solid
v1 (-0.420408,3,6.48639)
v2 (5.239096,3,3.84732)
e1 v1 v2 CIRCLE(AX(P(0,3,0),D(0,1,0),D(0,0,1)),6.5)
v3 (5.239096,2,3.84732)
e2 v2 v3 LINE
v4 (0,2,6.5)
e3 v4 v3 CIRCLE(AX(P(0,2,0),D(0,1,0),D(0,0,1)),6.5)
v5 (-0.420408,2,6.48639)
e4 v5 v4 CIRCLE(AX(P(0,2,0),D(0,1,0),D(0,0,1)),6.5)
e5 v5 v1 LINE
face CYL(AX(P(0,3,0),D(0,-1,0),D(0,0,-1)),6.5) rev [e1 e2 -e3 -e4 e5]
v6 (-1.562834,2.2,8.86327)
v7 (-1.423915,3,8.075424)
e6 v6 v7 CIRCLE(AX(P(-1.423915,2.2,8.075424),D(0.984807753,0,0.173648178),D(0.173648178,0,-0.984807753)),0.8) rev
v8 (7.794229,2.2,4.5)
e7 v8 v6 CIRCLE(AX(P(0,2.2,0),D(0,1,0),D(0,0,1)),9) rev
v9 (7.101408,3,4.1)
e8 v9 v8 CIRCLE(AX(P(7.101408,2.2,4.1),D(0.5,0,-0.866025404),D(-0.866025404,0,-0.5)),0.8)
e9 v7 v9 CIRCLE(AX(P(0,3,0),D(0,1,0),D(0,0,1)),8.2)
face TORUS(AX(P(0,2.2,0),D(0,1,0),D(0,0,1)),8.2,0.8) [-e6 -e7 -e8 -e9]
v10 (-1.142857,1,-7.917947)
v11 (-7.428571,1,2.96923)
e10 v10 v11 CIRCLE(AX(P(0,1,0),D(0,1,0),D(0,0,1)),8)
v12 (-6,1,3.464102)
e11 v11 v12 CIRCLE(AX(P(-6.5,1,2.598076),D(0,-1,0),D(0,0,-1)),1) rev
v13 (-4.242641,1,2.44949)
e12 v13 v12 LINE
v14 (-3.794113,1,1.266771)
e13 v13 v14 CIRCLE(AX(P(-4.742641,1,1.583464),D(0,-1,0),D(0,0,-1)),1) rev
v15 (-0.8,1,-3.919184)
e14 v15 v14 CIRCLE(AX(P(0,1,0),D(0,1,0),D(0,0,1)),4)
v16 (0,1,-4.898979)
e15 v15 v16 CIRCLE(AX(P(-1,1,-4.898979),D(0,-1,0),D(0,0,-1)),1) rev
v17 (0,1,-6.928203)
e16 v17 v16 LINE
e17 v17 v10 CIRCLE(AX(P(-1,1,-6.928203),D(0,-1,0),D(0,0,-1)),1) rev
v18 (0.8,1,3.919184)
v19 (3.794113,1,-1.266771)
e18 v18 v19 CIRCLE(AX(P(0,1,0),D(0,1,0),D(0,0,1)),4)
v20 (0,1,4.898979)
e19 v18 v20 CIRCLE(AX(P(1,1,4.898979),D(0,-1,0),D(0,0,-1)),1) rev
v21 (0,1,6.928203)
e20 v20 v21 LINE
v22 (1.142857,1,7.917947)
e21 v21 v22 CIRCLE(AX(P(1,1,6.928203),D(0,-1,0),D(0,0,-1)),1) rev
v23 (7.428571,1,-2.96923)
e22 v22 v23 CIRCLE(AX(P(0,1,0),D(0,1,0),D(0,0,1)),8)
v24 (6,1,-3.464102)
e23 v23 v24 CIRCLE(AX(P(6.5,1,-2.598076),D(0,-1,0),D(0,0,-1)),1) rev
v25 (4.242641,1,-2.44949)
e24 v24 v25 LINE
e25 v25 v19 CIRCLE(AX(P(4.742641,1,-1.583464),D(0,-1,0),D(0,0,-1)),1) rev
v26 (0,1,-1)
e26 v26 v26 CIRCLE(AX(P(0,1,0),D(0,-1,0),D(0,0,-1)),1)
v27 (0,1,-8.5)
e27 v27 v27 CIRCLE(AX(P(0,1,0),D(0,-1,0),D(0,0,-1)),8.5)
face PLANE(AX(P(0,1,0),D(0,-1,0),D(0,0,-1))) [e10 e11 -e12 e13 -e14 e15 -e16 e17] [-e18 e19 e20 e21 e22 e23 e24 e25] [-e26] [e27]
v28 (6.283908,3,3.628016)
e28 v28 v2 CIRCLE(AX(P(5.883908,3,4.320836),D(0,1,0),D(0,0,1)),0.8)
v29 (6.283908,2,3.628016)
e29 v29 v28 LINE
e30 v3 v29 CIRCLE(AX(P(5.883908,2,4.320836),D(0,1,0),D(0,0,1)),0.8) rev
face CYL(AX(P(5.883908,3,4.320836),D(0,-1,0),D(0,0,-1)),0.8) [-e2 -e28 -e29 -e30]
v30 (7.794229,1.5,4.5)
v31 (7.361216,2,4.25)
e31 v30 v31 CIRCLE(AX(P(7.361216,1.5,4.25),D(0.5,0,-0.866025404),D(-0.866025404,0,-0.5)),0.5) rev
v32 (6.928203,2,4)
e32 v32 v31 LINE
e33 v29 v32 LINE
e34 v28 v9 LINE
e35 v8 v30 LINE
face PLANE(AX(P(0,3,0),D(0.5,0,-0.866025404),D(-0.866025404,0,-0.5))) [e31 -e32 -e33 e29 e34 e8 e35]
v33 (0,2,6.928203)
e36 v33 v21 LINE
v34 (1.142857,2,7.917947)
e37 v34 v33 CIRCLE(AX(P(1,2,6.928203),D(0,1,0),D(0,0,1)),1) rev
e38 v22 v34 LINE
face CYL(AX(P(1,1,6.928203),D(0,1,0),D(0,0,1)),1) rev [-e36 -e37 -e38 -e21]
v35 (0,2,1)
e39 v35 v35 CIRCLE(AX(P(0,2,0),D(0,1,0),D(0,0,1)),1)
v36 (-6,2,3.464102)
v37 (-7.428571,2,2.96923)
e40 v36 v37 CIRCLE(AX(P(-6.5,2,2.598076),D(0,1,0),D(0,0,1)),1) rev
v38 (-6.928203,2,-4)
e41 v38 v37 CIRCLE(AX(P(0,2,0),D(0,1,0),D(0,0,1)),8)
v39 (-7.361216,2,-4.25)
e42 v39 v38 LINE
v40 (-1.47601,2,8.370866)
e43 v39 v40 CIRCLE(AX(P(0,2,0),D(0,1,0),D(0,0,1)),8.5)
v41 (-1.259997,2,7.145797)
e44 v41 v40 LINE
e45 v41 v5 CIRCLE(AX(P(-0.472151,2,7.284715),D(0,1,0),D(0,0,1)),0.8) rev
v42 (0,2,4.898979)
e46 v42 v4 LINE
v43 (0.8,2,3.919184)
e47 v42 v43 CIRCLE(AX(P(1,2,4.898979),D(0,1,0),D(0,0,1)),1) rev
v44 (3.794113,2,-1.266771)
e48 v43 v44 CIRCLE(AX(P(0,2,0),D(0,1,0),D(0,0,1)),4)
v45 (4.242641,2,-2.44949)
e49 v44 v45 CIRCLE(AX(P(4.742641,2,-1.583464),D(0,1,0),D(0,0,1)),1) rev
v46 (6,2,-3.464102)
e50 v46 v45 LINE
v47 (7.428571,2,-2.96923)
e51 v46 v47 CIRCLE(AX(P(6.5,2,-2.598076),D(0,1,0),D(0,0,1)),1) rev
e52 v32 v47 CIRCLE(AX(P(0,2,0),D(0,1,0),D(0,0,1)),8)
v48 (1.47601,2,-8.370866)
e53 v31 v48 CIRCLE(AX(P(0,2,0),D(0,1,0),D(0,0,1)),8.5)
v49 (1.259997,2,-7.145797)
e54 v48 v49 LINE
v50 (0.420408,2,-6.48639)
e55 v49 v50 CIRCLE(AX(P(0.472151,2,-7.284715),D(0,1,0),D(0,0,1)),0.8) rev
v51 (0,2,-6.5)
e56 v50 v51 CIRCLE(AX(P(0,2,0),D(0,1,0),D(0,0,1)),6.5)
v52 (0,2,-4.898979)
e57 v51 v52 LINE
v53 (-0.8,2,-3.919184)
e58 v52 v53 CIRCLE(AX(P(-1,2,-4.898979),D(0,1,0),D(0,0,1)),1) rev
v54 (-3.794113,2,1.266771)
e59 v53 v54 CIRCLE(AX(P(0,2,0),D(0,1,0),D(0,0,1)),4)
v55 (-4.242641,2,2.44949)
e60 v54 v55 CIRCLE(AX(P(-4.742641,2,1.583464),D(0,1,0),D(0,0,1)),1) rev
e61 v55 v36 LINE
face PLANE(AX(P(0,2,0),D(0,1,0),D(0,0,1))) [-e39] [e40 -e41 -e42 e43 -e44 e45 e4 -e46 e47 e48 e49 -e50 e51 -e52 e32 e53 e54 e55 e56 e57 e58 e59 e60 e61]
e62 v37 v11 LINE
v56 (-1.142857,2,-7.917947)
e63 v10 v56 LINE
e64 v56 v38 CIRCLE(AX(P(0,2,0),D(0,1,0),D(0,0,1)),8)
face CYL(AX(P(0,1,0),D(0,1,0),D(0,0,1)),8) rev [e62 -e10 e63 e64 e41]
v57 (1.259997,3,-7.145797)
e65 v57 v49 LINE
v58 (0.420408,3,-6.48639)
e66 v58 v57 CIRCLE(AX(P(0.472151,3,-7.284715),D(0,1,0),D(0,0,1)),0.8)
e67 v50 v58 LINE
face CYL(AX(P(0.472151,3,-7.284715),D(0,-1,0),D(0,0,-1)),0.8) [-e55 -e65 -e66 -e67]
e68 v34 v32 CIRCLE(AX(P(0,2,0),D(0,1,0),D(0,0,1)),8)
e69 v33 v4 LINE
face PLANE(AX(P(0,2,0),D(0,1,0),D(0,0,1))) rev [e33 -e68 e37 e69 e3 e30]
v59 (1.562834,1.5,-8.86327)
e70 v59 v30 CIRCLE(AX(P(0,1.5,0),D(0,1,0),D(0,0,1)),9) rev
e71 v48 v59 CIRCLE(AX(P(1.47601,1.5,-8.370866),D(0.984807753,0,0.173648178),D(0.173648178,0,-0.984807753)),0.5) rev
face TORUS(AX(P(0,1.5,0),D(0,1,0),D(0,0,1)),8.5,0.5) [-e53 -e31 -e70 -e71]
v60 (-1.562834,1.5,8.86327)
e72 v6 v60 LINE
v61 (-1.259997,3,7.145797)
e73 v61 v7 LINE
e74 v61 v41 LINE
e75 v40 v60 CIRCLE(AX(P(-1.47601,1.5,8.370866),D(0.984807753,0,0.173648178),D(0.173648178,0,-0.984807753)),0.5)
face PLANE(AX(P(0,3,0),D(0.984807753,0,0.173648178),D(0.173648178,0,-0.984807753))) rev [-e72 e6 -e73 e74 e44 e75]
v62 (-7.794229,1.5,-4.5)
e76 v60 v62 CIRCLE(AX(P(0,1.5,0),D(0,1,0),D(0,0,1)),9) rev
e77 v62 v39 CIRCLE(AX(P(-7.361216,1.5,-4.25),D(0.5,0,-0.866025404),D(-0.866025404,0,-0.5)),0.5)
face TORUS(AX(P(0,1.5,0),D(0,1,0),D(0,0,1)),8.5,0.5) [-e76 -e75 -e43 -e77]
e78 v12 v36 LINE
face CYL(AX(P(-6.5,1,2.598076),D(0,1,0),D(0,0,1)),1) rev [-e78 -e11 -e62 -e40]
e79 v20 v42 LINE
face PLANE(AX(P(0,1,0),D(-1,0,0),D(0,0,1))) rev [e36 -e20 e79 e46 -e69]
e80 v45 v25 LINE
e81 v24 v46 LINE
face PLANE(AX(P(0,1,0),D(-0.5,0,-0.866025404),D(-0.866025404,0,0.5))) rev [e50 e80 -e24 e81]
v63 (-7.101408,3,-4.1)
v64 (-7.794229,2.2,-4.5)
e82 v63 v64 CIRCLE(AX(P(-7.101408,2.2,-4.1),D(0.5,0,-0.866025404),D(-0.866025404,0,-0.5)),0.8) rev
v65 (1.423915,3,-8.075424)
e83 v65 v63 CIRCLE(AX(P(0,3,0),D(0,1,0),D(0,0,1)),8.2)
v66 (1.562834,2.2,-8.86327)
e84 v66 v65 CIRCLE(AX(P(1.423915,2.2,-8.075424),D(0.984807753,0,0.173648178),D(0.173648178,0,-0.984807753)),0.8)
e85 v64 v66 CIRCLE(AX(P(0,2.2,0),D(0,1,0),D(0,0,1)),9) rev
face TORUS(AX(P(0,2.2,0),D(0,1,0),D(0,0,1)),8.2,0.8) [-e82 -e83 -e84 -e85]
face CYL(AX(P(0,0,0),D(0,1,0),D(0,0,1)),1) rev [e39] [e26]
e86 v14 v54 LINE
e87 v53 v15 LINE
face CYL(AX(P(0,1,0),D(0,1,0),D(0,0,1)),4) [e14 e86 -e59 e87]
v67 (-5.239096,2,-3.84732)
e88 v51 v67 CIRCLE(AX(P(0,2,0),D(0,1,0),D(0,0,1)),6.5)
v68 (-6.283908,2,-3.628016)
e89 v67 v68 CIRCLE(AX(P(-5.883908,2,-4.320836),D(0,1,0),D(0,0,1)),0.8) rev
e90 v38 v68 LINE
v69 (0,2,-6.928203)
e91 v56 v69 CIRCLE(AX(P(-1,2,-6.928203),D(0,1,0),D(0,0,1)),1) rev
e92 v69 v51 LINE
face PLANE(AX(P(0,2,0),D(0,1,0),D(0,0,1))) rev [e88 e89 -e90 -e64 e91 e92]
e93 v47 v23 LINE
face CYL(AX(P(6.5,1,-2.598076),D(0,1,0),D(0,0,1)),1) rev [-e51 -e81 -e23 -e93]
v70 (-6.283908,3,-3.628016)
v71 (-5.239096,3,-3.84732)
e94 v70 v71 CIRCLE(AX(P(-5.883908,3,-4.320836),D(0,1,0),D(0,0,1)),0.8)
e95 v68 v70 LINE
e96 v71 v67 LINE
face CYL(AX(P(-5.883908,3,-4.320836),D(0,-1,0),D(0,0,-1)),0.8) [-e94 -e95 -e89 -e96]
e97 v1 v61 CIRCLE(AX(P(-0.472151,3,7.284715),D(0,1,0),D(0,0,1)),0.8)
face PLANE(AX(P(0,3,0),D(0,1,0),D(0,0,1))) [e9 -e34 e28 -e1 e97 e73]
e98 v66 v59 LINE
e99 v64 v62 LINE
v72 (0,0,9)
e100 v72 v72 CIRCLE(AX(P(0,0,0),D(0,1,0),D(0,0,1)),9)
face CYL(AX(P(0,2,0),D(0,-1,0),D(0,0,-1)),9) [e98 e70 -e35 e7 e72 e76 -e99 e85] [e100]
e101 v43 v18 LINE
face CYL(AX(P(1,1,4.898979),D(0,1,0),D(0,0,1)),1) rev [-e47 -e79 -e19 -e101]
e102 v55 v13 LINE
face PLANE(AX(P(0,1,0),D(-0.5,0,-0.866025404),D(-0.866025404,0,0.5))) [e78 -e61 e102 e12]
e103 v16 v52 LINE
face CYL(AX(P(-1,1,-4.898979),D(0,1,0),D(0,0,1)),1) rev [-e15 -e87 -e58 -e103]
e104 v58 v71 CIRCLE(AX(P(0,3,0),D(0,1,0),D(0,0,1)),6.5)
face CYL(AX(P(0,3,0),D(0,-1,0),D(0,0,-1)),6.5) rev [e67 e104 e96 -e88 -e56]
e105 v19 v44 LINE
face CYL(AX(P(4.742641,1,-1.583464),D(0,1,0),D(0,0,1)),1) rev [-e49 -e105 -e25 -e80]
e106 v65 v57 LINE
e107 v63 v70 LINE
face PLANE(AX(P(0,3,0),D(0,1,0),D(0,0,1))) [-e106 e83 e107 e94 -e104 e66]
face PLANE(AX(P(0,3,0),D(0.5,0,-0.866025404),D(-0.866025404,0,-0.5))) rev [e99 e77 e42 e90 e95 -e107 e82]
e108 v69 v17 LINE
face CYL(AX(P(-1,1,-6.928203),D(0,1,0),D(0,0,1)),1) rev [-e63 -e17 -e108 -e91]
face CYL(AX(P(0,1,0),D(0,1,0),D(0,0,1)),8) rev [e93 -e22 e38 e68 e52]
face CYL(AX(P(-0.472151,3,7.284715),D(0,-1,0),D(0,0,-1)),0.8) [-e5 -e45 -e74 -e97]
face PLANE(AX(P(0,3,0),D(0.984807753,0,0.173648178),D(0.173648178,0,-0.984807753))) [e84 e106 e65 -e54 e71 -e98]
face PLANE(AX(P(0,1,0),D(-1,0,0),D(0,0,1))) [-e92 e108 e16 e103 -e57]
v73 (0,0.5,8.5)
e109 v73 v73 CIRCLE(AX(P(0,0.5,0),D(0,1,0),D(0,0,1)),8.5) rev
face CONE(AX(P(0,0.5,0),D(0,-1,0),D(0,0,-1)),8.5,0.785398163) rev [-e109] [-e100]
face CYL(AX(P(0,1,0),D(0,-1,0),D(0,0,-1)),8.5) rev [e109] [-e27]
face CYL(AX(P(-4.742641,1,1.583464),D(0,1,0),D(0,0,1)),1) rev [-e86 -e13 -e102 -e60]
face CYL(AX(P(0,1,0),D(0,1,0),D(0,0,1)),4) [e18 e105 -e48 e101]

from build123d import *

# Parameters (mm, degrees)
SKETCH_1_R          = 9
EXTRUDE_1_DEPTH     = 2
SKETCH_2_R          = 8.5
CUT_EXTRUDE_1_DEPTH = 1
CHAMFER_1_SIZE      = 0.5
CUT_EXTRUDE_2_DEPTH = 1
FILLET_1_R          = 1
SKETCH_4_R          = 1
CUT_EXTRUDE_3_DEPTH = 13.884098727
EXTRUDE_START       = 1
EXTRUDE_2_DEPTH     = 1
FILLET_3_R          = 0.8
FILLET_4_R          = 0.8
FILLET_5_R          = 0.5


# Some blends are built 0.0001 mm under size
with BuildPart() as part:
    # 草图1 → 凸台-拉伸1 (new body)
    with BuildSketch(Plane(origin=(0, 0, 0), x_dir=(1, 0, 0), z_dir=(0, 1, 0))):
        with Locations(Location((0, 0, 0), (0, 0, 270))):
            Circle(SKETCH_1_R)
    extrude(amount=EXTRUDE_1_DEPTH)

    # 草图2 → 切除-拉伸1 (cut)
    with BuildSketch(Plane.XZ):
        with Locations(Location((0, 0, 0), (0, 0, 270))):
            Circle(SKETCH_2_R)
    extrude(amount=-CUT_EXTRUDE_1_DEPTH, mode=Mode.SUBTRACT)

    # 倒角1
    chamfer_1_edges = [part.edges().sort_by_distance(p)[0] for p in [
        (0, 0, 8.5),
    ]]
    chamfer(chamfer_1_edges, length=CHAMFER_1_SIZE - 0.0001)  # a hair under: the kernel refuses the full size

    # 草图3 → 切除-拉伸2 (cut)
    with BuildSketch(Plane(origin=(0, 2, 0), x_dir=(1, 0, 0), z_dir=(0, 1, 0))):
        with BuildLine():
            Line((0, 4), (0, 8))
            ThreePointArc((0, 8), (-6.92820323, 4), (-6.92820323, -4))
            Line((-6.92820323, -4), (-3.464101615, -2))
            ThreePointArc((-3.464101615, -2), (-3.464101615, 2), (0, 4))
        make_face()
        with BuildLine():
            ThreePointArc((0, -8), (6.92820323, -4), (6.92820323, 4))
            Line((6.92820323, 4), (3.464101615, 2))
            ThreePointArc((3.464101615, 2), (3.464101615, -2), (0, -4))
            Line((0, -4), (0, -8))
        make_face()
    extrude(amount=-CUT_EXTRUDE_2_DEPTH, mode=Mode.SUBTRACT)

    # 圆角1
    fillet_1_edges = [part.edges().sort_by_distance(p)[0] for p in [
        (0, 1.5, -8),
        (0, 1.5, -4),
        (-3.464101615, 1.5, 2),
        (-6.92820323, 1.5, 4),
        (0, 1.5, 8),
        (0, 1.5, 4),
        (3.464101615, 1.5, -2),
        (6.92820323, 1.5, -4),
    ]]
    fillet(fillet_1_edges, radius=FILLET_1_R)

    # 草图4 → 切除-拉伸3 (cut, through all)
    with BuildSketch(Plane(origin=(0, 2, 0), x_dir=(1, 0, 0), z_dir=(0, 1, 0))):
        with Locations(Location((0, 0, 0), (0, 0, 270))):
            Circle(SKETCH_4_R)
    extrude(amount=-CUT_EXTRUDE_3_DEPTH, mode=Mode.SUBTRACT)

    # 草图5 → 凸台-拉伸2 (add)
    with BuildSketch(Plane(origin=(0, 2, 0), x_dir=(1, 0, 0), z_dir=(0, 1, 0)).offset(EXTRUDE_START)):
        with BuildLine():
            ThreePointArc((1.562833599, 8.863269777), (-3.803564356, 8.156770083), (-7.794228634, 4.5))
            Line((-7.794228634, 4.5), (-6.92820323, 4))
            ThreePointArc((-6.92820323, 4), (-4.485875631, 6.623965566), (-1.142857143, 7.917946549))
            ThreePointArc((-1.142857143, 7.917946549), (-0.345346329, 7.684132176), (0, 6.92820323))
            Line((0, 6.92820323), (0, 6.5))
            ThreePointArc((0, 6.5), (0.566512328, 6.475265538), (1.128713155, 6.401250395))
            Line((1.128713155, 6.401250395), (1.562833599, 8.863269777))
        make_face()
        with BuildLine():
            ThreePointArc((-1.142857143, 7.917946549), (-4.485875631, 6.623965566), (-6.92820323, 4))
            Line((-6.92820323, 4), (-5.629165125, 3.25))
            ThreePointArc((-5.629165125, 3.25), (-3.25, 5.629165125), (0, 6.5))
            Line((0, 6.5), (0, 6.92820323))
            ThreePointArc((0, 6.92820323), (-0.345346329, 7.684132176), (-1.142857143, 7.917946549))
        make_face()
        with BuildLine():
            ThreePointArc((5.629165125, -3.25), (3.25, -5.629165125), (0, -6.5))
            Line((0, -6.5), (0, -6.92820323))
            ThreePointArc((0, -6.92820323), (0.345346329, -7.684132176), (1.142857143, -7.917946549))
            ThreePointArc((1.142857143, -7.917946549), (4.485875631, -6.623965566), (6.92820323, -4))
            Line((6.92820323, -4), (5.629165125, -3.25))
        make_face()
        with BuildLine():
            Line((-1.128713155, -6.401250395), (-1.562833599, -8.863269777))
            ThreePointArc((-1.562833599, -8.863269777), (3.803564356, -8.156770083), (7.794228634, -4.5))
            Line((7.794228634, -4.5), (6.92820323, -4))
            ThreePointArc((6.92820323, -4), (4.485875631, -6.623965566), (1.142857143, -7.917946549))
            ThreePointArc((1.142857143, -7.917946549), (0.345346329, -7.684132176), (0, -6.92820323))
            Line((0, -6.92820323), (0, -6.5))
            ThreePointArc((0, -6.5), (-0.566512328, -6.475265538), (-1.128713155, -6.401250395))
        make_face()
    extrude(amount=-EXTRUDE_2_DEPTH)

    # 圆角3
    fillet_3_edges = [part.edges().sort_by_distance(p)[0] for p in [
        (-3.803564356, 3, -8.156770083),
        (3.803564356, 3, 8.156770083),
    ]]
    fillet(fillet_3_edges, radius=FILLET_3_R)

    # 圆角4
    fillet_4_edges = [part.edges().sort_by_distance(p)[0] for p in [
        (-5.629165125, 2.5, -3.25),
        (1.128713155, 2.5, -6.401250395),
        (5.629165125, 2.5, 3.25),
        (-1.128713155, 2.5, 6.401250395),
    ]]
    fillet(fillet_4_edges, radius=FILLET_4_R)

    # 圆角5
    # the kernel refuses this fillet: 0.5 mm, written as the material it takes off along each edge
    with BuildSketch(Plane(origin=(0, 2, 0), x_dir=(-0.8660254037844409, 0, -0.49999999999999595), z_dir=(0.49999999999999595, 0, -0.8660254037844409))) as fillet_5_piece_1:
        with BuildLine():
            CenterArc((9 - FILLET_5_R, -FILLET_5_R), FILLET_5_R, 0, 90)
            Line((9 - FILLET_5_R, 0), (9, 0))
            Line((9, 0), (9, -FILLET_5_R))
        make_face()
    revolve(axis=Axis((0, 2, 0), (0, 1, 0)), revolution_arc=110, mode=Mode.SUBTRACT)
    with BuildSketch(Plane(origin=(0, 2, 0), x_dir=(0.866025403784441, 0, 0.49999999999999584), z_dir=(-0.49999999999999584, 0, 0.866025403784441))) as fillet_5_piece_2:
        with BuildLine():
            CenterArc((9 - FILLET_5_R, -FILLET_5_R), FILLET_5_R, 0, 90)
            Line((9 - FILLET_5_R, 0), (9, 0))
            Line((9, 0), (9, -FILLET_5_R))
        make_face()
    revolve(axis=Axis((0, 2, 0), (0, 1, 0)), revolution_arc=110, mode=Mode.SUBTRACT)


solid = part.part
